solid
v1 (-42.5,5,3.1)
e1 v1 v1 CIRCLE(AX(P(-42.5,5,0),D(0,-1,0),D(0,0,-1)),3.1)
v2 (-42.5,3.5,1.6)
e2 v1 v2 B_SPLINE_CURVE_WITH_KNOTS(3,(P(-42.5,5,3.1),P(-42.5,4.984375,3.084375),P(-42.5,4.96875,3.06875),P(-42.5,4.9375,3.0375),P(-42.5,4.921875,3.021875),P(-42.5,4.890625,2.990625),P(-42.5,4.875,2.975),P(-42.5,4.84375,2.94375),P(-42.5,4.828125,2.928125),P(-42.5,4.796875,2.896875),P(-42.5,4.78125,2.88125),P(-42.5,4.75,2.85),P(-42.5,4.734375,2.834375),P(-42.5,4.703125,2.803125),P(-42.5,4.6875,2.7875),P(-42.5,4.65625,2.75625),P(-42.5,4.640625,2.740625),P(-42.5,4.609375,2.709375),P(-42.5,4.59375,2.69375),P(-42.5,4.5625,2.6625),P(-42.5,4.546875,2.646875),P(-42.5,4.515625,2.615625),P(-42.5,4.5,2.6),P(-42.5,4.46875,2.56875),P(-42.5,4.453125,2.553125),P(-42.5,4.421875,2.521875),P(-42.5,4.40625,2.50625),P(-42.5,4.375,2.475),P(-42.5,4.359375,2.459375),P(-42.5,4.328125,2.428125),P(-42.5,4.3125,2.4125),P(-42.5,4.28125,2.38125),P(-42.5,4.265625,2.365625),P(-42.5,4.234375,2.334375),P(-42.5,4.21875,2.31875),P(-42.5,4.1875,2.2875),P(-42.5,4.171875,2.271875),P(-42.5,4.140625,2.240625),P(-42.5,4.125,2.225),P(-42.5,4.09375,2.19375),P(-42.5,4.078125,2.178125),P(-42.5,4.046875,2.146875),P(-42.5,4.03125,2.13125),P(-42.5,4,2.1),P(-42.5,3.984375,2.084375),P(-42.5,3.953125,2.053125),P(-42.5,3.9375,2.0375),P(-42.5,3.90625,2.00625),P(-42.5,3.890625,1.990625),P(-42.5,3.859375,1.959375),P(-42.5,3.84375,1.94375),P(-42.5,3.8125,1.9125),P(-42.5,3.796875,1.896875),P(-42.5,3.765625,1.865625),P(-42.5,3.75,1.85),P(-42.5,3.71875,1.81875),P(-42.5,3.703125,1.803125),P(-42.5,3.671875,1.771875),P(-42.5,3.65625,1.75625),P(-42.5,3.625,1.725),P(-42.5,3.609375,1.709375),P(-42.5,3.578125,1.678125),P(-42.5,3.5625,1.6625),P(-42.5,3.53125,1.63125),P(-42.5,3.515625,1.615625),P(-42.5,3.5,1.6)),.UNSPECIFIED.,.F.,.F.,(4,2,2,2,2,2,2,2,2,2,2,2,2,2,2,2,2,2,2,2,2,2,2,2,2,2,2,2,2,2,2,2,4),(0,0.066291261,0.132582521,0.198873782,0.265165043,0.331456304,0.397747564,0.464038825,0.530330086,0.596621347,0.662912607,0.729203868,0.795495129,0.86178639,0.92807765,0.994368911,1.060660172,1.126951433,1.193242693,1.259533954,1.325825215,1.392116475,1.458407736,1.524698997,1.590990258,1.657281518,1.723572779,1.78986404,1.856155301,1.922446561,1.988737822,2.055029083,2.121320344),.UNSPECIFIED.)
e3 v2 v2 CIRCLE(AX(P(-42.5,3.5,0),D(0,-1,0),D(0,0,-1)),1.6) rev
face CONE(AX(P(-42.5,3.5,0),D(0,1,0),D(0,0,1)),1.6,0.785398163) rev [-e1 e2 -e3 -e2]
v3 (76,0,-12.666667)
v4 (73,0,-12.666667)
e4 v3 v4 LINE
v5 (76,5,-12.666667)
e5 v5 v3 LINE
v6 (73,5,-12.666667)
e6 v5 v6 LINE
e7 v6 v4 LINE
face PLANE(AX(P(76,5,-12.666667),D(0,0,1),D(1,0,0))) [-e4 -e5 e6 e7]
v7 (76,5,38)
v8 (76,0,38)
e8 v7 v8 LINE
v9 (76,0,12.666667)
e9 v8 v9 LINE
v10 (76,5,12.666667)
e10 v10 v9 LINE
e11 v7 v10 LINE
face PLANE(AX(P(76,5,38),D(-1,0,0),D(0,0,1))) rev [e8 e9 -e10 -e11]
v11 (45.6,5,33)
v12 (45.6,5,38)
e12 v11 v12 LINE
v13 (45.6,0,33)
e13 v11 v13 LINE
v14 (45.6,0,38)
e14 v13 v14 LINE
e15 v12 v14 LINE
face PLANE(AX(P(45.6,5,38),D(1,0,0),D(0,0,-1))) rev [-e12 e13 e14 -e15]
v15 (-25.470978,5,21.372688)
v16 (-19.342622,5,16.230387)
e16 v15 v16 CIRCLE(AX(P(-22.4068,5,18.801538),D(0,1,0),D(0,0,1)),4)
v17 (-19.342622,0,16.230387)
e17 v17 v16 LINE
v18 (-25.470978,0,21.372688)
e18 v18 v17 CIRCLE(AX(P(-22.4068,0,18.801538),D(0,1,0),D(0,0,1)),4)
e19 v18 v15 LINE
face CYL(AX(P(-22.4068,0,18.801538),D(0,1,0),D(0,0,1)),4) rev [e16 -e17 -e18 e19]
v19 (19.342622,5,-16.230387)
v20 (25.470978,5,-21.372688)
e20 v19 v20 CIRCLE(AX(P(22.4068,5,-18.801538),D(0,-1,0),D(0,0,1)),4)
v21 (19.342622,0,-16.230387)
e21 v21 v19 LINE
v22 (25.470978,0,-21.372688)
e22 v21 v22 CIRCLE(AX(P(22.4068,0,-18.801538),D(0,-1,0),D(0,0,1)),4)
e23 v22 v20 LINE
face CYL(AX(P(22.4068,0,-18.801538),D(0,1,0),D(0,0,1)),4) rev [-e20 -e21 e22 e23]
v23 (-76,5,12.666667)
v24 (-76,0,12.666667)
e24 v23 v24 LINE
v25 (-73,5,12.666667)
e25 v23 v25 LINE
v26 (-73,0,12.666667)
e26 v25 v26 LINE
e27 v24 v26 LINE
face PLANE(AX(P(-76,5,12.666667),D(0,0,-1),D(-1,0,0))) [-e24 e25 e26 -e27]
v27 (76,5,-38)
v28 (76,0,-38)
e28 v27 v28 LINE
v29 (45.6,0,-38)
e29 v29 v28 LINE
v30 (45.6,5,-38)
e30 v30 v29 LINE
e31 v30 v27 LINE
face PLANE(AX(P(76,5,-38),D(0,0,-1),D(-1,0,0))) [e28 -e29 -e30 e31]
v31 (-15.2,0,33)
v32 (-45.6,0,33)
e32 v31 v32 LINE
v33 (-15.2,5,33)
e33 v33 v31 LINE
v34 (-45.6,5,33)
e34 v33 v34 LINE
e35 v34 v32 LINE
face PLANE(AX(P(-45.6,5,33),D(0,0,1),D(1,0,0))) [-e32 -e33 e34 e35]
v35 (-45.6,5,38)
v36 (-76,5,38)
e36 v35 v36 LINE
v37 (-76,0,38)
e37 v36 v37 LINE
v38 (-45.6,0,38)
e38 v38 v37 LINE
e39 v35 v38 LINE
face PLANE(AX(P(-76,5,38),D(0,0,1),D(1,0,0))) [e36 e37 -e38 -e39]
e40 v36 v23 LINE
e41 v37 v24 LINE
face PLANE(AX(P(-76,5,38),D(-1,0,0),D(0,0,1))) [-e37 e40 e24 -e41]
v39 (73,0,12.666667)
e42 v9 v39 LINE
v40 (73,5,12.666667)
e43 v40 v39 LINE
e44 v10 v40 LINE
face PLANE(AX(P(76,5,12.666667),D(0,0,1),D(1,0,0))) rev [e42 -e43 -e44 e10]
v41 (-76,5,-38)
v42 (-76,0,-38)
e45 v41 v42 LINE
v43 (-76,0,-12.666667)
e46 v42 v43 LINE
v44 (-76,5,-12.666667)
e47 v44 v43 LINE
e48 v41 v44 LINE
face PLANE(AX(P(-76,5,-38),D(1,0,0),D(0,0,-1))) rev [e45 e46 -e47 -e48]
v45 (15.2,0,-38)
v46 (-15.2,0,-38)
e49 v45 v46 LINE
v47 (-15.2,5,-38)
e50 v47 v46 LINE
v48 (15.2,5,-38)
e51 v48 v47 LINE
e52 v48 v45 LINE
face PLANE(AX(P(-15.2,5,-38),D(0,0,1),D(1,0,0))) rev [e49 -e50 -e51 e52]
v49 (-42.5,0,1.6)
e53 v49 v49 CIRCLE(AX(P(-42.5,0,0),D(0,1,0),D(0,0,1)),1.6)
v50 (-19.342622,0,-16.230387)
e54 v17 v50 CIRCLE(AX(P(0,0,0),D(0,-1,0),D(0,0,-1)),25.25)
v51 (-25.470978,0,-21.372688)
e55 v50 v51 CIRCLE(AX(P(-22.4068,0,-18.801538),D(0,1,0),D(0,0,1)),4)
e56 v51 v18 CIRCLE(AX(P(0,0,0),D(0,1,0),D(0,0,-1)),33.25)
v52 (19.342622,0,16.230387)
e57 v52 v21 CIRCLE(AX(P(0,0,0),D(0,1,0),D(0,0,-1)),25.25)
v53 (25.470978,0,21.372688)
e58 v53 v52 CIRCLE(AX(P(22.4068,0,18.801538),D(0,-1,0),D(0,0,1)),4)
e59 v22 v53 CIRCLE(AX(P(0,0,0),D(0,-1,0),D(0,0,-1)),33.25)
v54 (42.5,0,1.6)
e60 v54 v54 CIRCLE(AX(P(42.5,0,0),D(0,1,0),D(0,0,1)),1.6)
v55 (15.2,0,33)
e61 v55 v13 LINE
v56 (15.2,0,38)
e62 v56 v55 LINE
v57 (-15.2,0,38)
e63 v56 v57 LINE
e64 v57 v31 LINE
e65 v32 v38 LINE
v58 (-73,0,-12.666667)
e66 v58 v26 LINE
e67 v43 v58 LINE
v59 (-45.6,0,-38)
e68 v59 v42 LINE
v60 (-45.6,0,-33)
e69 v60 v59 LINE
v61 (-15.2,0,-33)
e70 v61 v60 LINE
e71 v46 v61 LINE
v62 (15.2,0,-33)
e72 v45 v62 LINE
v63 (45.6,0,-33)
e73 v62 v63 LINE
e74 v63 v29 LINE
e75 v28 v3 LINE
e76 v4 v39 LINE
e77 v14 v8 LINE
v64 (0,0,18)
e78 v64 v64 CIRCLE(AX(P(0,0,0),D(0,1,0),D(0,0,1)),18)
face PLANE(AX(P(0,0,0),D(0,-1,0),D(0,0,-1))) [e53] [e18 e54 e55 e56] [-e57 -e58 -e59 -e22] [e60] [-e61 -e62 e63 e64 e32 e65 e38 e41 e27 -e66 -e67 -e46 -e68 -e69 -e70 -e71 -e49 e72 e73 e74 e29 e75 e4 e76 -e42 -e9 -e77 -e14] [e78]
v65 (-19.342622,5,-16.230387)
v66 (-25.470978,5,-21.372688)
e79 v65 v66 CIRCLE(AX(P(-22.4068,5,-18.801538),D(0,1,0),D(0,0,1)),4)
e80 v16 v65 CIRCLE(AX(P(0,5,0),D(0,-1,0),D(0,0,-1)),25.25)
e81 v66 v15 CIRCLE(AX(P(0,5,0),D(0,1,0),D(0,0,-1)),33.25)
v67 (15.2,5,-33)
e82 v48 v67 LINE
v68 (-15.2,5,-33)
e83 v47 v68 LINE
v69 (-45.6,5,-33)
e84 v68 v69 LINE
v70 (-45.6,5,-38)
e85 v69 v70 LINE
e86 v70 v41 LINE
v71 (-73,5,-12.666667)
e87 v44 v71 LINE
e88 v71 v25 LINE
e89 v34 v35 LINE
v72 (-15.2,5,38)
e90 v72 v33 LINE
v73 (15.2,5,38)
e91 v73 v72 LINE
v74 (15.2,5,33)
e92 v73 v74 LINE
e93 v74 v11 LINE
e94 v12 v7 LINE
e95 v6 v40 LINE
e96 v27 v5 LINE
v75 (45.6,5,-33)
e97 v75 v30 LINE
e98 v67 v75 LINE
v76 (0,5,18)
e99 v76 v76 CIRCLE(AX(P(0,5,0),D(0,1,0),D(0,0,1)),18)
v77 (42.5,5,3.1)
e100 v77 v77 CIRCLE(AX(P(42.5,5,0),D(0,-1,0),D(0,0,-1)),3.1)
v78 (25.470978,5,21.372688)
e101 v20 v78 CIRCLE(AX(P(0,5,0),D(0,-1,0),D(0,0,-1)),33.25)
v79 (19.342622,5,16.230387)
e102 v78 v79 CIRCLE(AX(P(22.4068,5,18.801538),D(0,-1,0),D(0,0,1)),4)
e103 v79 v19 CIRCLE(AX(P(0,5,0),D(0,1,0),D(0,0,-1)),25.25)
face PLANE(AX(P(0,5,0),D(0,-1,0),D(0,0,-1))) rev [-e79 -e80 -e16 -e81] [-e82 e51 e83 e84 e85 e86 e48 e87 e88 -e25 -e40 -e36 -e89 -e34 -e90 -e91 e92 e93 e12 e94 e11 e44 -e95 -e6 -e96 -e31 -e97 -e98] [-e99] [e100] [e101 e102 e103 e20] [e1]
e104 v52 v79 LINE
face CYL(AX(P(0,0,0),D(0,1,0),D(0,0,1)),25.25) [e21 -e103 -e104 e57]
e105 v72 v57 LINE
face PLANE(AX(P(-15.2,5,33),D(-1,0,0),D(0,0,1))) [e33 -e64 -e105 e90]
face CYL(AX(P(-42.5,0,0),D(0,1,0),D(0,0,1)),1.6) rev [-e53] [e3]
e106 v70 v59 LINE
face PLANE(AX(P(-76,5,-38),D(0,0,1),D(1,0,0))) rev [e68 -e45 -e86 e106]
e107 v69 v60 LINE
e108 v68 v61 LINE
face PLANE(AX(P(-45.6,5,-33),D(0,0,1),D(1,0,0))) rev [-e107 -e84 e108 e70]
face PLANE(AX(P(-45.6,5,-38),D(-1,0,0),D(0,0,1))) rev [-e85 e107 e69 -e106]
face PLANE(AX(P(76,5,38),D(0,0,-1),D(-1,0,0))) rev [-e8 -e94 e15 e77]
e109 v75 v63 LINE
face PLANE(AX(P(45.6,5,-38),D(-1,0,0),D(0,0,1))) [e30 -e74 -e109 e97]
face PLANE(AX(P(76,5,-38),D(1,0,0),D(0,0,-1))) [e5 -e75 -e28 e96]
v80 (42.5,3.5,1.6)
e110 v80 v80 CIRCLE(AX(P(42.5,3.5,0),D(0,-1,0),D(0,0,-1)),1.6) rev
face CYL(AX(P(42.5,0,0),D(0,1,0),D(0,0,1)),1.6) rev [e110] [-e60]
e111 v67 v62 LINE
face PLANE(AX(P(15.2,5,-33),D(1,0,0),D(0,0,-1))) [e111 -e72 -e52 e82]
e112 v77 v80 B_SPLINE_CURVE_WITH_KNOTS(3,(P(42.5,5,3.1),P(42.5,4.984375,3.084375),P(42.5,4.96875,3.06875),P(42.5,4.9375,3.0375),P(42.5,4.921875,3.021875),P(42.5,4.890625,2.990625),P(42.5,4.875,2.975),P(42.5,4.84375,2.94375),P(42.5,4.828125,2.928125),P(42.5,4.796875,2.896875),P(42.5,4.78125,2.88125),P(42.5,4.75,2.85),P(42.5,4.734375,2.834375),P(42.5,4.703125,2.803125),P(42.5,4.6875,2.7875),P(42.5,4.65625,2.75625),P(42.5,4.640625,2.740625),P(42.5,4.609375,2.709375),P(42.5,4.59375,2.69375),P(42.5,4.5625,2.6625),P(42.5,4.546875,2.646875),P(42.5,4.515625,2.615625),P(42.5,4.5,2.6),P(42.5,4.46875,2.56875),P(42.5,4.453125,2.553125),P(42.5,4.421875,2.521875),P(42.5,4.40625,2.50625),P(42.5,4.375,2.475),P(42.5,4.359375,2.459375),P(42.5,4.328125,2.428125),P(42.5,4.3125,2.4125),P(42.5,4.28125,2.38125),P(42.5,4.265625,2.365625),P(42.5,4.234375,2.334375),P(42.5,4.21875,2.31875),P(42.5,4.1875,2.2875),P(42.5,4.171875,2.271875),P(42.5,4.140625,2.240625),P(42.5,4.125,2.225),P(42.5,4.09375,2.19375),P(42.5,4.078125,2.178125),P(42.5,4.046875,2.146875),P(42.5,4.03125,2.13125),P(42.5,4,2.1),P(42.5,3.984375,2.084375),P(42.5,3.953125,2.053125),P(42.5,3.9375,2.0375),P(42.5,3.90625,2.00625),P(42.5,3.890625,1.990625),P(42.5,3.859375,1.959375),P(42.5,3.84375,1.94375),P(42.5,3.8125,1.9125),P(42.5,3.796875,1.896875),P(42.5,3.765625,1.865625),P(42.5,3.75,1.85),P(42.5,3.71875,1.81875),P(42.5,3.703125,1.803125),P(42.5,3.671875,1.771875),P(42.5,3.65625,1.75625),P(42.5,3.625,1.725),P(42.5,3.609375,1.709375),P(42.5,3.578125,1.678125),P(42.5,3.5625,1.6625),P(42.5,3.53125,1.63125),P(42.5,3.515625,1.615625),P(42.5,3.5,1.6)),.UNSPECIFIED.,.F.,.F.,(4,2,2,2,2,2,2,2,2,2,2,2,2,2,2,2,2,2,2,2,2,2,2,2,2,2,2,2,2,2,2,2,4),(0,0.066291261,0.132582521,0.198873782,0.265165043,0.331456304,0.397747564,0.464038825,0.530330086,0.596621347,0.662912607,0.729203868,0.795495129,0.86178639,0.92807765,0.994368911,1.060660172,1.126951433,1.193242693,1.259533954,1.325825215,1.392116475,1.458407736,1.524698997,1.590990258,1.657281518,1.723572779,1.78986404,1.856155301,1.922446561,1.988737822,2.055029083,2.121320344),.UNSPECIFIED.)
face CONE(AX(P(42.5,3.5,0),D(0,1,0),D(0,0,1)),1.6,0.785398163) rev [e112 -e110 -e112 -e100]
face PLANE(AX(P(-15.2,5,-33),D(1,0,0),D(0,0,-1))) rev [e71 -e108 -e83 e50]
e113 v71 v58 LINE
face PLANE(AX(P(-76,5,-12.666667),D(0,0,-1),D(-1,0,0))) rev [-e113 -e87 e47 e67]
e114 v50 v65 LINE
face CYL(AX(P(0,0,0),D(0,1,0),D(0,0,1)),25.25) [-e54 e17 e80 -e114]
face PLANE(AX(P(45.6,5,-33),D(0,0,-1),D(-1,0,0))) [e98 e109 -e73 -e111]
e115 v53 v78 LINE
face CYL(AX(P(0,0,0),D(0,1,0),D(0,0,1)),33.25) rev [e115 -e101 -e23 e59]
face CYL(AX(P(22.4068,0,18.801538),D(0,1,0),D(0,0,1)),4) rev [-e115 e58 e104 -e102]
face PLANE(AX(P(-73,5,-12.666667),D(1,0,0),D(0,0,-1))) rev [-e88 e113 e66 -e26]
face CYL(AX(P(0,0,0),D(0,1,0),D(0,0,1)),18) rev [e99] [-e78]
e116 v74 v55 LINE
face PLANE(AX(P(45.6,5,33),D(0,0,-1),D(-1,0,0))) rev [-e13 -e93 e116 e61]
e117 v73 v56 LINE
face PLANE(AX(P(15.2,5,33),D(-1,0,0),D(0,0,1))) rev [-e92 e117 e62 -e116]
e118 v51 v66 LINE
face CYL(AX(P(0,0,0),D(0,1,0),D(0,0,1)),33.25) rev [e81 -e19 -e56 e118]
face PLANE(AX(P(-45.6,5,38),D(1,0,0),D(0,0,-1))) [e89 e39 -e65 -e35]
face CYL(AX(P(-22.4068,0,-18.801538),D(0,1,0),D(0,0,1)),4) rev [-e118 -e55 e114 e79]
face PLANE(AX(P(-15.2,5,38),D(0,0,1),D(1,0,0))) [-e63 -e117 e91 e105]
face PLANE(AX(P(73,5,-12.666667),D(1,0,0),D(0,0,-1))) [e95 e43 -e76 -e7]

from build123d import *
from build123d.topology import SkipClean

# Parameters (mm, degrees)
BOSS_EXTRUDE1_DEPTH   = 5
MIRROR1_START         = -33
MIRROR1_OUTLINE_W     = 146
MIRROR1_OUTLINE_H     = 5
MIRROR1_DEPTH         = 66
MIRROR1_START_2       = -38
MIRROR1_2_OUTLINE_W   = 27.4
MIRROR1_2_OUTLINE_H   = 5
MIRROR1_2_OUTLINE_W_2 = 30.4
MIRROR1_2_DEPTH       = 76
MIRROR1_START_3       = 12.666666667
MIRROR1_3_OUTLINE_W   = 3
MIRROR1_3_OUTLINE_H   = 5
MIRROR1_3_DEPTH       = 25.333333333
MIRROR1_4_OUTLINE_W   = 3
MIRROR1_4_OUTLINE_H   = 5
MIRROR1_4_DEPTH       = 25.333333333
CUT_EXTRUDE1_DEPTH    = 86.117565755
SKETCH3_R             = 1.6
CUT_EXTRUDE2_DEPTH    = 86.117565755
CHAMFER1_SIZE         = 1.5


# Read off the part's stored shape, not the designer's step: Mirror1
with BuildPart() as part:
    # Sketch1 → Boss-Extrude1 (new body)
    with BuildSketch(Plane(origin=(0, 0, 0), x_dir=(1, 0, 0), z_dir=(0, 1, 0))):
        Polygon((-76, 38), (-76, 12.666666667), (-73, 12.666666667), (-73, 0), (0, 0), (0, 38), (-15.2, 38), (-15.2, 33), (-45.6, 33), (-45.6, 38), align=None)
    extrude(amount=BOSS_EXTRUDE1_DEPTH)

    # Mirror1 outline → Mirror1 (add)
    with BuildSketch(Plane.XY.offset(MIRROR1_START)):
        with Locations((0, 2.5)):
            Rectangle(MIRROR1_OUTLINE_W, MIRROR1_OUTLINE_H)
    extrude(amount=MIRROR1_DEPTH)

    # Mirror1 2 outline → Mirror1 2 (add)
    with BuildSketch(Plane.XY.offset(MIRROR1_START_2)):
        with Locations((-59.3, 2.5)):
            Rectangle(MIRROR1_2_OUTLINE_W, MIRROR1_2_OUTLINE_H)
        with Locations((0, 2.5)):
            Rectangle(MIRROR1_2_OUTLINE_W_2, MIRROR1_2_OUTLINE_H)
        with Locations((59.3, 2.5)):
            Rectangle(MIRROR1_2_OUTLINE_W, MIRROR1_2_OUTLINE_H)
    extrude(amount=MIRROR1_2_DEPTH)

    # Mirror1 3 outline → Mirror1 3 (add)
    with BuildSketch(Plane.XY.offset(MIRROR1_START_3)):
        with Locations((-74.5, 2.5)):
            Rectangle(MIRROR1_3_OUTLINE_W, MIRROR1_3_OUTLINE_H)
        with Locations((74.5, 2.5)):
            Rectangle(MIRROR1_3_OUTLINE_W, MIRROR1_3_OUTLINE_H)
    extrude(amount=MIRROR1_3_DEPTH)

    # Mirror1 4 outline → Mirror1 4 (add)
    with BuildSketch(Plane.XY.offset(MIRROR1_START_2)):
        with Locations((74.5, 2.5)):
            Rectangle(MIRROR1_4_OUTLINE_W, MIRROR1_4_OUTLINE_H)
    extrude(amount=MIRROR1_4_DEPTH)

    # Sketch2 → Cut-Extrude1 (cut, through all)
    with BuildSketch(Plane(origin=(0, 5, 0), x_dir=(1, 0, 0), z_dir=(0, 1, 0))):
        with BuildLine():
            Line((0, 18), (0, -18))
            ThreePointArc((0, -18), (-18, 0), (0, 18))
        make_face()
        with BuildLine():
            ThreePointArc((-19.342622189, 16.230387145), (-19.835649522, 21.865715356), (-25.470977734, 21.372688022))
            ThreePointArc((-25.470977734, 21.372688022), (-33.25, 0), (-25.470977734, -21.372688022))
            ThreePointArc((-25.470977734, -21.372688022), (-19.835649522, -21.865715356), (-19.342622189, -16.230387145))
            ThreePointArc((-19.342622189, -16.230387145), (-25.25, 0), (-19.342622189, 16.230387145))
        make_face()
    cut_extrude1 = extrude(amount=-CUT_EXTRUDE1_DEPTH, mode=Mode.SUBTRACT)

    # Sketch3 → Cut-Extrude2 (cut, through all)
    with BuildSketch(Plane(origin=(0, 5, 0), x_dir=(1, 0, 0), z_dir=(0, 1, 0))):
        with Locations(Location((-42.5, 0, 0), (0, 0, 270))):
            Circle(SKETCH3_R)
        with Locations(Location((42.5, 0, 0), (0, 0, 270))):
            Circle(SKETCH3_R)
    extrude(amount=-CUT_EXTRUDE2_DEPTH, mode=Mode.SUBTRACT)

    # Chamfer1
    chamfer1_edges = [part.edges().sort_by_distance(p)[0] for p in [
        (-42.5, 5, -1.6),
        (42.5, 5, -1.6),
    ]]
    chamfer(chamfer1_edges, length=CHAMFER1_SIZE)

    # Mirror3: Cut-Extrude1 across plane
    with SkipClean():  # the faces are left unmerged after this step: merging them gives an invalid solid
        add(cut_extrude1.mirror(Plane(origin=(0, 0, 0), x_dir=(0, 0, 1), z_dir=(1, 0, 0))), mode=Mode.SUBTRACT)


solid = part.part
